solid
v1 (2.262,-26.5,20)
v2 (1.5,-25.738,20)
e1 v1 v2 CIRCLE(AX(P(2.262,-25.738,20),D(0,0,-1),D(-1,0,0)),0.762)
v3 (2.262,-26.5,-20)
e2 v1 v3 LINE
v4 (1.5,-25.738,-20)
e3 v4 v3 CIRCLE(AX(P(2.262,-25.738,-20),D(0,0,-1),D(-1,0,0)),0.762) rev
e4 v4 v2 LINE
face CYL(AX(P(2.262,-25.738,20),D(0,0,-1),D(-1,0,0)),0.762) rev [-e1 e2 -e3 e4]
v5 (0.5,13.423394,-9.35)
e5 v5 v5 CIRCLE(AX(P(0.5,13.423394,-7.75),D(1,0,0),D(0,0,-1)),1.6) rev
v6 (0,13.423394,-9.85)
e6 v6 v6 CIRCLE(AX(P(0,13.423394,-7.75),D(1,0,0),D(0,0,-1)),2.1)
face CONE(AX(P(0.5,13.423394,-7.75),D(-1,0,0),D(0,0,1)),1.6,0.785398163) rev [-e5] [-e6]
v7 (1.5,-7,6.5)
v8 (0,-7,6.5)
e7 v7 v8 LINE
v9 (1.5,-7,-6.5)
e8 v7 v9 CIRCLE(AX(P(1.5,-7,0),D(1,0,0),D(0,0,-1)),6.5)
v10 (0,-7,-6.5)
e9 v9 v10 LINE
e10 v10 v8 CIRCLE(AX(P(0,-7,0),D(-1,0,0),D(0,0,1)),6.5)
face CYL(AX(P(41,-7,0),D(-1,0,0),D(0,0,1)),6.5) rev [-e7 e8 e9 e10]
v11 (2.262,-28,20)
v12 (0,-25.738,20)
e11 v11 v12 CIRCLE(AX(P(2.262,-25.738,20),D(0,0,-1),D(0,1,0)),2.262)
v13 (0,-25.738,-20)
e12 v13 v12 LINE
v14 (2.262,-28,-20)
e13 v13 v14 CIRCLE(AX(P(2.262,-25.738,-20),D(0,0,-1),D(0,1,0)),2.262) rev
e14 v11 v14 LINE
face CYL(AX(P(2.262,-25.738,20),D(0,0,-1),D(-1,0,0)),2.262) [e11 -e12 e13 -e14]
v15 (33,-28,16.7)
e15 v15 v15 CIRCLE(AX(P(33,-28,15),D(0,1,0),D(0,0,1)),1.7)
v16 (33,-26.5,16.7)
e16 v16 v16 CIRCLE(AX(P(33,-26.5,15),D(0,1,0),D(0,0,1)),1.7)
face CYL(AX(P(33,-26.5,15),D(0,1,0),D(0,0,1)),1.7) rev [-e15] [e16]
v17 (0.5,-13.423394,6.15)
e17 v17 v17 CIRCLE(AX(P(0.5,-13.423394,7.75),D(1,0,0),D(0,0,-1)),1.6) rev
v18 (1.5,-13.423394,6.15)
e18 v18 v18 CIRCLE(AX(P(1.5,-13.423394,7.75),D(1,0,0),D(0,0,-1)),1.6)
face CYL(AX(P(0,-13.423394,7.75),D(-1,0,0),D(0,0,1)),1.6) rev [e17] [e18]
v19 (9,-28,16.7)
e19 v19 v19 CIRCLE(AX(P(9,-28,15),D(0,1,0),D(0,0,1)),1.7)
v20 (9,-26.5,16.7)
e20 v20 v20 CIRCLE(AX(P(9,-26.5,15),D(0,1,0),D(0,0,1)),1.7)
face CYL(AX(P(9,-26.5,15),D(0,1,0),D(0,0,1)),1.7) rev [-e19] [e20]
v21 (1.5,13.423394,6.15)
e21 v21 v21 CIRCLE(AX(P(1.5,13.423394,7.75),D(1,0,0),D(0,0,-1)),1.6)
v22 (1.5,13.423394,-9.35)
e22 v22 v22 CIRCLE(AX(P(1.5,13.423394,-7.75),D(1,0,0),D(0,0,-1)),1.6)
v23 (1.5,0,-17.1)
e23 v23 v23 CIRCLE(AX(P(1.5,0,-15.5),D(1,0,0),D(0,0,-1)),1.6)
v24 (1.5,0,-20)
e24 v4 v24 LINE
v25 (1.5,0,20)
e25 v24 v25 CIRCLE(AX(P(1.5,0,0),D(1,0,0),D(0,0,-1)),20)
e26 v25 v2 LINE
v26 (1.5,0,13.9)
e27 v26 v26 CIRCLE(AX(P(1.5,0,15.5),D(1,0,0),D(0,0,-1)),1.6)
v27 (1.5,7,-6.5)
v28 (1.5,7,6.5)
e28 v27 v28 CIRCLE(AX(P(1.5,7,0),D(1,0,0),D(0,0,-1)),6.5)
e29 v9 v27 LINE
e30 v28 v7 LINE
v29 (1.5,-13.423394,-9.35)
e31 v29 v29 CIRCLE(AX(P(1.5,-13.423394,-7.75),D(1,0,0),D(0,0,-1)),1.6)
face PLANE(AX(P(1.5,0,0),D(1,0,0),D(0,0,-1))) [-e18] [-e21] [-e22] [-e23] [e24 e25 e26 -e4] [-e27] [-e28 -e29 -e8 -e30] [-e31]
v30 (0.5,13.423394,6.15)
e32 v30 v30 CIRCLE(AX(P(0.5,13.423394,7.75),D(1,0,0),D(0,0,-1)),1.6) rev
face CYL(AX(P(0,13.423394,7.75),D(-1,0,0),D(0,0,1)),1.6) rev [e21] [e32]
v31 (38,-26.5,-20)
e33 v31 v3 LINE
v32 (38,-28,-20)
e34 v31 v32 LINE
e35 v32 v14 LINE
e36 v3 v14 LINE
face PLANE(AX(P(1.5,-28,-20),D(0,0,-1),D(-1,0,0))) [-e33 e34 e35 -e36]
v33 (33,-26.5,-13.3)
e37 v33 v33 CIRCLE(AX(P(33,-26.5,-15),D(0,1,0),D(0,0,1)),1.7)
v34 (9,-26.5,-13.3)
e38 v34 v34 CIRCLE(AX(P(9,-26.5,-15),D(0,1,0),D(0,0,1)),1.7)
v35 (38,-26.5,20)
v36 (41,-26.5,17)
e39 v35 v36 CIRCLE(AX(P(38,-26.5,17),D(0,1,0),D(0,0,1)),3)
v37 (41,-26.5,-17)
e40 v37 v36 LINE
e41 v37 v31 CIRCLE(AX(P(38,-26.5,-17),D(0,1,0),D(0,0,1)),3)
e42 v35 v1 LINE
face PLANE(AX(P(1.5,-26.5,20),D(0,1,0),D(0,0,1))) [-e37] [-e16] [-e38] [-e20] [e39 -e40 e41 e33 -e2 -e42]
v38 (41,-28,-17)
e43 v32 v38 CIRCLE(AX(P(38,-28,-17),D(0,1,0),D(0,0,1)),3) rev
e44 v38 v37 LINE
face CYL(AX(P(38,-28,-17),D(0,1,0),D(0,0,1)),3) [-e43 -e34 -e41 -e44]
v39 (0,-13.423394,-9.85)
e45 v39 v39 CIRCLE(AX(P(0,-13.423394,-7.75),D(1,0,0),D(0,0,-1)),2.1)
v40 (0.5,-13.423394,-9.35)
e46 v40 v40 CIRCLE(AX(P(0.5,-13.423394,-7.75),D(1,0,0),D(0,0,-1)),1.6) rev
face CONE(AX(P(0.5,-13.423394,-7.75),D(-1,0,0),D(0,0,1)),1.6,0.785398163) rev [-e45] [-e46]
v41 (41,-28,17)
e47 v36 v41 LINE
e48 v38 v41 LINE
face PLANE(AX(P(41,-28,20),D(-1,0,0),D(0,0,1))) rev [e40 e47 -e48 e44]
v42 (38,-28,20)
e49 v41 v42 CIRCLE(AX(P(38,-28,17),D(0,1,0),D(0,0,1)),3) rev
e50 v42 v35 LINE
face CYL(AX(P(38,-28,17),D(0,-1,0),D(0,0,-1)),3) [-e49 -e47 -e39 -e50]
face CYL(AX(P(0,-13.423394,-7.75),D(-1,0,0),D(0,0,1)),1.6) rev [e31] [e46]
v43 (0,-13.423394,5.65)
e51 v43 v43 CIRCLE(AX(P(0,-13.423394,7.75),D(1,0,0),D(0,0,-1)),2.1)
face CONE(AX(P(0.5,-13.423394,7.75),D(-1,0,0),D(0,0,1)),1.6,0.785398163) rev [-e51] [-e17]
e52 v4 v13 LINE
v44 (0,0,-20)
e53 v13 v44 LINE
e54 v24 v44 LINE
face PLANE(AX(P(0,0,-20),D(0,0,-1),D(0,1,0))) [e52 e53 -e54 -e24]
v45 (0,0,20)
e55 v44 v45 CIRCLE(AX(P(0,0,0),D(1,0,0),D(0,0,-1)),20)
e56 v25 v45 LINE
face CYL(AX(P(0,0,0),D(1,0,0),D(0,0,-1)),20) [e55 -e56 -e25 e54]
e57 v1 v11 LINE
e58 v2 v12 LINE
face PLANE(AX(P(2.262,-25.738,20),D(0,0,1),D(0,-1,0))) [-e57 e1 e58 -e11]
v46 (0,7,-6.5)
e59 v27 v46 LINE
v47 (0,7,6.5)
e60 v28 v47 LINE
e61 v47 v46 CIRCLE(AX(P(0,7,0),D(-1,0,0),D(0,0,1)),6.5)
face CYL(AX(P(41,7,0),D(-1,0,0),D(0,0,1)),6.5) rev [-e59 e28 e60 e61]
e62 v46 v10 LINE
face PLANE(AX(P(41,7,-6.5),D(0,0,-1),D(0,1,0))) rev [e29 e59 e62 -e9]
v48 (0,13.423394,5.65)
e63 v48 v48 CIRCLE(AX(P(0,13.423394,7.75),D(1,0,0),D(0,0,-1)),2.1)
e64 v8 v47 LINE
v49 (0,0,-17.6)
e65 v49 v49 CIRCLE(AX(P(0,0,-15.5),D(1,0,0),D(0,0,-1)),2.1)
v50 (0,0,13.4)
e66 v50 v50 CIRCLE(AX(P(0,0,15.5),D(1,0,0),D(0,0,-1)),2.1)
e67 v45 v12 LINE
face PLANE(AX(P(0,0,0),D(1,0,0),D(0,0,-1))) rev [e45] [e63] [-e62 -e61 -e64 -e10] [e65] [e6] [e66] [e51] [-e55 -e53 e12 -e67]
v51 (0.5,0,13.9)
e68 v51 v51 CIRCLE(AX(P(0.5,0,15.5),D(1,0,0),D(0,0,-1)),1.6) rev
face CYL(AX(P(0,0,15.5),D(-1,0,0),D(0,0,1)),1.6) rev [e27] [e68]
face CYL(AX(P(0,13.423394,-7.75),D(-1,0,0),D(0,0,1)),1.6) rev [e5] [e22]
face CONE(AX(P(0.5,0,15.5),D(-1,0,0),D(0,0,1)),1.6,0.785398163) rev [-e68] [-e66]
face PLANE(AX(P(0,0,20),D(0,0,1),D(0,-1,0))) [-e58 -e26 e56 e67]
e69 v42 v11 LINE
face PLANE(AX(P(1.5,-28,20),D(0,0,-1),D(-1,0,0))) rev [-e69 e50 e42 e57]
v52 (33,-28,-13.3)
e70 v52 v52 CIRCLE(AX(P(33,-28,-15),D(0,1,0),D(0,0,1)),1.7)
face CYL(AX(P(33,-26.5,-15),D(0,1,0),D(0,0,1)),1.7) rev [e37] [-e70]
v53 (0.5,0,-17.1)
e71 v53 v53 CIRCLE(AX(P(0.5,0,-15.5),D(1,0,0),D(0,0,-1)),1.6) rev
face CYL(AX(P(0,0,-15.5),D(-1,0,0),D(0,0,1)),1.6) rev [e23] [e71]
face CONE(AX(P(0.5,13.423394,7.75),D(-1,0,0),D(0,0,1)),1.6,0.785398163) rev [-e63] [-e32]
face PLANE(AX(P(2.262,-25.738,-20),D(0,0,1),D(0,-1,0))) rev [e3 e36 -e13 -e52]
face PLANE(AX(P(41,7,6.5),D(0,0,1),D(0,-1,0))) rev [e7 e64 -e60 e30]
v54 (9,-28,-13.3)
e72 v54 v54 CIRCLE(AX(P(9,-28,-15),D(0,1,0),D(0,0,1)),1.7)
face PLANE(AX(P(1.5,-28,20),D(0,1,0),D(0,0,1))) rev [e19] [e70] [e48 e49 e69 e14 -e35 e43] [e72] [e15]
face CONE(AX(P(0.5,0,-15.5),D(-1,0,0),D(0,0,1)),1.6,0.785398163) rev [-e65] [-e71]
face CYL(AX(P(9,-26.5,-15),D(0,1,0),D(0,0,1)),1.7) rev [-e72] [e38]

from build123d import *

# Parameters (mm, degrees)
BOSS_EXTRUDE1_DEPTH    = 1.5
SKETCH2_W              = 41
SKETCH2_H              = 40
BOSS_EXTRUDE2_DEPTH    = 1.5
CONVERT_SOLID1_START   = -20
CONVERT_SOLID1_DEPTH   = 40
CONVERT_SOLID1_2_DEPTH = 40
M3_CLEARANCE_HOLE1_D   = 3.2
CIRPATTERN1_COUNT      = 6
CUT_EXTRUDE1_DEPTH     = 54.525694764
M3_CLEARANCE_HOLE2_D   = 3.4
LPATTERN1_COUNT        = 2
LPATTERN1_PITCH        = 24
LPATTERN1_COPY_1_D     = 3.4
FILLET1_R              = 3
CHAMFER1_SIZE          = 0.5
CHAMFER2_SIZE          = 0.5


# Read off the part's stored shape, not the designer's step: Convert-Solid1
with BuildPart() as part:
    # Sketch1 → Boss-Extrude1 (new body)
    with BuildSketch(Plane(origin=(0, 0, 0), x_dir=(0, 0, -1), z_dir=(1, 0, 0))):
        with BuildLine():
            Line((-20, 0), (-20, -28))
            Line((-20, -28), (20, -28))
            Line((20, -28), (20, 0))
            ThreePointArc((20, 0), (0, 20), (-20, 0))
        make_face()
    extrude(amount=BOSS_EXTRUDE1_DEPTH)

    # Sketch2 → Boss-Extrude2 (add)
    with BuildSketch(Plane.XZ.offset(28)):
        with Locations((20.5, 0)):
            Rectangle(SKETCH2_W, SKETCH2_H)
    extrude(amount=-BOSS_EXTRUDE2_DEPTH)

    # Convert-Solid1 outline → Convert-Solid1 (cut)
    with BuildSketch(Plane.XY.offset(CONVERT_SOLID1_START)):
        with BuildLine():
            Line((0, -28), (2.262, -28))
            ThreePointArc((2.262, -28), (0.662524461, -27.337475539), (0, -25.738))
            Line((0, -25.738), (0, -28))
        make_face()
    extrude(amount=CONVERT_SOLID1_DEPTH, mode=Mode.SUBTRACT)

    # Convert-Solid1 2 outline → Convert-Solid1 2 (add)
    with BuildSketch(Plane.XY.offset(CONVERT_SOLID1_START)):
        with BuildLine():
            Line((1.5, -26.5), (2.262, -26.5))
            ThreePointArc((2.262, -26.5), (1.723184633, -26.276815367), (1.5, -25.738))
            Line((1.5, -25.738), (1.5, -26.5))
        make_face()
    extrude(amount=CONVERT_SOLID1_2_DEPTH)

    # M3 Clearance Hole1 (through all)
    with Locations(Plane.ZY):
        with Locations((-15.5, 0)):
            m3_clearance_hole1 = Hole(M3_CLEARANCE_HOLE1_D / 2)

    # CirPattern1: M3 Clearance Hole1 ×6 about axis
    cirpattern1_axis = Axis((0, 0, 0), (1, 0, 0))
    for i in range(1, CIRPATTERN1_COUNT):
        add(m3_clearance_hole1.rotate(cirpattern1_axis, i * 360 / CIRPATTERN1_COUNT), mode=Mode.SUBTRACT)

    # Sketch9 → Cut-Extrude1 (cut, through all)
    with BuildSketch(Plane.ZY):
        with BuildLine():
            Line((6.5, 7), (6.5, -7))
            ThreePointArc((6.5, -7), (0, -13.5), (-6.5, -7))
            Line((-6.5, -7), (-6.5, 7))
            ThreePointArc((-6.5, 7), (0, 13.5), (6.5, 7))
        make_face()
    extrude(amount=-CUT_EXTRUDE1_DEPTH, mode=Mode.SUBTRACT)

    # M3 Clearance Hole2 (through all)
    with Locations(Plane(origin=(0, -26.5, 0), x_dir=(1, 0, 0), z_dir=(0, 1, 0))):
        with Locations((33, 15)):
            m3_clearance_hole2 = Hole(M3_CLEARANCE_HOLE2_D / 2)

    # Mirror1: M3 Clearance Hole2 across plane
    add(m3_clearance_hole2.mirror(Plane.XY), mode=Mode.SUBTRACT)

    # LPattern1: M3 Clearance Hole2 ×2
    with Locations(*[(-i * LPATTERN1_PITCH, 0, 0) for i in range(1, LPATTERN1_COUNT)]):
        add(m3_clearance_hole2, mode=Mode.SUBTRACT)

    # LPattern1 copy 1 (through all)
    with Locations(Plane(origin=(-24, -26.5, 0), x_dir=(1, 0, 0), z_dir=(0, 1, 0))):
        with Locations((33, -15)):
            Hole(LPATTERN1_COPY_1_D / 2)

    # Fillet1
    fillet1_edges = [part.edges().sort_by_distance(p)[0] for p in [
        (41, -27.25, 20),
        (41, -27.25, -20),
    ]]
    fillet(fillet1_edges, radius=FILLET1_R)

    # Chamfer1
    chamfer1_edges = [part.edges().sort_by_distance(p)[0] for p in [
        (0, 12.037753113, -6.95),
    ]]
    chamfer(chamfer1_edges, length=CHAMFER1_SIZE)

    # Chamfer2
    chamfer2_edges = [part.edges().sort_by_distance(p)[0] for p in [
        (0, 0, -13.9),
        (0, 12.037753113, 6.95),
        (0, 0, 13.9),
        (0, -12.037753113, 6.95),
        (0, -12.037753113, -6.95),
    ]]
    chamfer(chamfer2_edges, length=CHAMFER2_SIZE)


solid = part.part
